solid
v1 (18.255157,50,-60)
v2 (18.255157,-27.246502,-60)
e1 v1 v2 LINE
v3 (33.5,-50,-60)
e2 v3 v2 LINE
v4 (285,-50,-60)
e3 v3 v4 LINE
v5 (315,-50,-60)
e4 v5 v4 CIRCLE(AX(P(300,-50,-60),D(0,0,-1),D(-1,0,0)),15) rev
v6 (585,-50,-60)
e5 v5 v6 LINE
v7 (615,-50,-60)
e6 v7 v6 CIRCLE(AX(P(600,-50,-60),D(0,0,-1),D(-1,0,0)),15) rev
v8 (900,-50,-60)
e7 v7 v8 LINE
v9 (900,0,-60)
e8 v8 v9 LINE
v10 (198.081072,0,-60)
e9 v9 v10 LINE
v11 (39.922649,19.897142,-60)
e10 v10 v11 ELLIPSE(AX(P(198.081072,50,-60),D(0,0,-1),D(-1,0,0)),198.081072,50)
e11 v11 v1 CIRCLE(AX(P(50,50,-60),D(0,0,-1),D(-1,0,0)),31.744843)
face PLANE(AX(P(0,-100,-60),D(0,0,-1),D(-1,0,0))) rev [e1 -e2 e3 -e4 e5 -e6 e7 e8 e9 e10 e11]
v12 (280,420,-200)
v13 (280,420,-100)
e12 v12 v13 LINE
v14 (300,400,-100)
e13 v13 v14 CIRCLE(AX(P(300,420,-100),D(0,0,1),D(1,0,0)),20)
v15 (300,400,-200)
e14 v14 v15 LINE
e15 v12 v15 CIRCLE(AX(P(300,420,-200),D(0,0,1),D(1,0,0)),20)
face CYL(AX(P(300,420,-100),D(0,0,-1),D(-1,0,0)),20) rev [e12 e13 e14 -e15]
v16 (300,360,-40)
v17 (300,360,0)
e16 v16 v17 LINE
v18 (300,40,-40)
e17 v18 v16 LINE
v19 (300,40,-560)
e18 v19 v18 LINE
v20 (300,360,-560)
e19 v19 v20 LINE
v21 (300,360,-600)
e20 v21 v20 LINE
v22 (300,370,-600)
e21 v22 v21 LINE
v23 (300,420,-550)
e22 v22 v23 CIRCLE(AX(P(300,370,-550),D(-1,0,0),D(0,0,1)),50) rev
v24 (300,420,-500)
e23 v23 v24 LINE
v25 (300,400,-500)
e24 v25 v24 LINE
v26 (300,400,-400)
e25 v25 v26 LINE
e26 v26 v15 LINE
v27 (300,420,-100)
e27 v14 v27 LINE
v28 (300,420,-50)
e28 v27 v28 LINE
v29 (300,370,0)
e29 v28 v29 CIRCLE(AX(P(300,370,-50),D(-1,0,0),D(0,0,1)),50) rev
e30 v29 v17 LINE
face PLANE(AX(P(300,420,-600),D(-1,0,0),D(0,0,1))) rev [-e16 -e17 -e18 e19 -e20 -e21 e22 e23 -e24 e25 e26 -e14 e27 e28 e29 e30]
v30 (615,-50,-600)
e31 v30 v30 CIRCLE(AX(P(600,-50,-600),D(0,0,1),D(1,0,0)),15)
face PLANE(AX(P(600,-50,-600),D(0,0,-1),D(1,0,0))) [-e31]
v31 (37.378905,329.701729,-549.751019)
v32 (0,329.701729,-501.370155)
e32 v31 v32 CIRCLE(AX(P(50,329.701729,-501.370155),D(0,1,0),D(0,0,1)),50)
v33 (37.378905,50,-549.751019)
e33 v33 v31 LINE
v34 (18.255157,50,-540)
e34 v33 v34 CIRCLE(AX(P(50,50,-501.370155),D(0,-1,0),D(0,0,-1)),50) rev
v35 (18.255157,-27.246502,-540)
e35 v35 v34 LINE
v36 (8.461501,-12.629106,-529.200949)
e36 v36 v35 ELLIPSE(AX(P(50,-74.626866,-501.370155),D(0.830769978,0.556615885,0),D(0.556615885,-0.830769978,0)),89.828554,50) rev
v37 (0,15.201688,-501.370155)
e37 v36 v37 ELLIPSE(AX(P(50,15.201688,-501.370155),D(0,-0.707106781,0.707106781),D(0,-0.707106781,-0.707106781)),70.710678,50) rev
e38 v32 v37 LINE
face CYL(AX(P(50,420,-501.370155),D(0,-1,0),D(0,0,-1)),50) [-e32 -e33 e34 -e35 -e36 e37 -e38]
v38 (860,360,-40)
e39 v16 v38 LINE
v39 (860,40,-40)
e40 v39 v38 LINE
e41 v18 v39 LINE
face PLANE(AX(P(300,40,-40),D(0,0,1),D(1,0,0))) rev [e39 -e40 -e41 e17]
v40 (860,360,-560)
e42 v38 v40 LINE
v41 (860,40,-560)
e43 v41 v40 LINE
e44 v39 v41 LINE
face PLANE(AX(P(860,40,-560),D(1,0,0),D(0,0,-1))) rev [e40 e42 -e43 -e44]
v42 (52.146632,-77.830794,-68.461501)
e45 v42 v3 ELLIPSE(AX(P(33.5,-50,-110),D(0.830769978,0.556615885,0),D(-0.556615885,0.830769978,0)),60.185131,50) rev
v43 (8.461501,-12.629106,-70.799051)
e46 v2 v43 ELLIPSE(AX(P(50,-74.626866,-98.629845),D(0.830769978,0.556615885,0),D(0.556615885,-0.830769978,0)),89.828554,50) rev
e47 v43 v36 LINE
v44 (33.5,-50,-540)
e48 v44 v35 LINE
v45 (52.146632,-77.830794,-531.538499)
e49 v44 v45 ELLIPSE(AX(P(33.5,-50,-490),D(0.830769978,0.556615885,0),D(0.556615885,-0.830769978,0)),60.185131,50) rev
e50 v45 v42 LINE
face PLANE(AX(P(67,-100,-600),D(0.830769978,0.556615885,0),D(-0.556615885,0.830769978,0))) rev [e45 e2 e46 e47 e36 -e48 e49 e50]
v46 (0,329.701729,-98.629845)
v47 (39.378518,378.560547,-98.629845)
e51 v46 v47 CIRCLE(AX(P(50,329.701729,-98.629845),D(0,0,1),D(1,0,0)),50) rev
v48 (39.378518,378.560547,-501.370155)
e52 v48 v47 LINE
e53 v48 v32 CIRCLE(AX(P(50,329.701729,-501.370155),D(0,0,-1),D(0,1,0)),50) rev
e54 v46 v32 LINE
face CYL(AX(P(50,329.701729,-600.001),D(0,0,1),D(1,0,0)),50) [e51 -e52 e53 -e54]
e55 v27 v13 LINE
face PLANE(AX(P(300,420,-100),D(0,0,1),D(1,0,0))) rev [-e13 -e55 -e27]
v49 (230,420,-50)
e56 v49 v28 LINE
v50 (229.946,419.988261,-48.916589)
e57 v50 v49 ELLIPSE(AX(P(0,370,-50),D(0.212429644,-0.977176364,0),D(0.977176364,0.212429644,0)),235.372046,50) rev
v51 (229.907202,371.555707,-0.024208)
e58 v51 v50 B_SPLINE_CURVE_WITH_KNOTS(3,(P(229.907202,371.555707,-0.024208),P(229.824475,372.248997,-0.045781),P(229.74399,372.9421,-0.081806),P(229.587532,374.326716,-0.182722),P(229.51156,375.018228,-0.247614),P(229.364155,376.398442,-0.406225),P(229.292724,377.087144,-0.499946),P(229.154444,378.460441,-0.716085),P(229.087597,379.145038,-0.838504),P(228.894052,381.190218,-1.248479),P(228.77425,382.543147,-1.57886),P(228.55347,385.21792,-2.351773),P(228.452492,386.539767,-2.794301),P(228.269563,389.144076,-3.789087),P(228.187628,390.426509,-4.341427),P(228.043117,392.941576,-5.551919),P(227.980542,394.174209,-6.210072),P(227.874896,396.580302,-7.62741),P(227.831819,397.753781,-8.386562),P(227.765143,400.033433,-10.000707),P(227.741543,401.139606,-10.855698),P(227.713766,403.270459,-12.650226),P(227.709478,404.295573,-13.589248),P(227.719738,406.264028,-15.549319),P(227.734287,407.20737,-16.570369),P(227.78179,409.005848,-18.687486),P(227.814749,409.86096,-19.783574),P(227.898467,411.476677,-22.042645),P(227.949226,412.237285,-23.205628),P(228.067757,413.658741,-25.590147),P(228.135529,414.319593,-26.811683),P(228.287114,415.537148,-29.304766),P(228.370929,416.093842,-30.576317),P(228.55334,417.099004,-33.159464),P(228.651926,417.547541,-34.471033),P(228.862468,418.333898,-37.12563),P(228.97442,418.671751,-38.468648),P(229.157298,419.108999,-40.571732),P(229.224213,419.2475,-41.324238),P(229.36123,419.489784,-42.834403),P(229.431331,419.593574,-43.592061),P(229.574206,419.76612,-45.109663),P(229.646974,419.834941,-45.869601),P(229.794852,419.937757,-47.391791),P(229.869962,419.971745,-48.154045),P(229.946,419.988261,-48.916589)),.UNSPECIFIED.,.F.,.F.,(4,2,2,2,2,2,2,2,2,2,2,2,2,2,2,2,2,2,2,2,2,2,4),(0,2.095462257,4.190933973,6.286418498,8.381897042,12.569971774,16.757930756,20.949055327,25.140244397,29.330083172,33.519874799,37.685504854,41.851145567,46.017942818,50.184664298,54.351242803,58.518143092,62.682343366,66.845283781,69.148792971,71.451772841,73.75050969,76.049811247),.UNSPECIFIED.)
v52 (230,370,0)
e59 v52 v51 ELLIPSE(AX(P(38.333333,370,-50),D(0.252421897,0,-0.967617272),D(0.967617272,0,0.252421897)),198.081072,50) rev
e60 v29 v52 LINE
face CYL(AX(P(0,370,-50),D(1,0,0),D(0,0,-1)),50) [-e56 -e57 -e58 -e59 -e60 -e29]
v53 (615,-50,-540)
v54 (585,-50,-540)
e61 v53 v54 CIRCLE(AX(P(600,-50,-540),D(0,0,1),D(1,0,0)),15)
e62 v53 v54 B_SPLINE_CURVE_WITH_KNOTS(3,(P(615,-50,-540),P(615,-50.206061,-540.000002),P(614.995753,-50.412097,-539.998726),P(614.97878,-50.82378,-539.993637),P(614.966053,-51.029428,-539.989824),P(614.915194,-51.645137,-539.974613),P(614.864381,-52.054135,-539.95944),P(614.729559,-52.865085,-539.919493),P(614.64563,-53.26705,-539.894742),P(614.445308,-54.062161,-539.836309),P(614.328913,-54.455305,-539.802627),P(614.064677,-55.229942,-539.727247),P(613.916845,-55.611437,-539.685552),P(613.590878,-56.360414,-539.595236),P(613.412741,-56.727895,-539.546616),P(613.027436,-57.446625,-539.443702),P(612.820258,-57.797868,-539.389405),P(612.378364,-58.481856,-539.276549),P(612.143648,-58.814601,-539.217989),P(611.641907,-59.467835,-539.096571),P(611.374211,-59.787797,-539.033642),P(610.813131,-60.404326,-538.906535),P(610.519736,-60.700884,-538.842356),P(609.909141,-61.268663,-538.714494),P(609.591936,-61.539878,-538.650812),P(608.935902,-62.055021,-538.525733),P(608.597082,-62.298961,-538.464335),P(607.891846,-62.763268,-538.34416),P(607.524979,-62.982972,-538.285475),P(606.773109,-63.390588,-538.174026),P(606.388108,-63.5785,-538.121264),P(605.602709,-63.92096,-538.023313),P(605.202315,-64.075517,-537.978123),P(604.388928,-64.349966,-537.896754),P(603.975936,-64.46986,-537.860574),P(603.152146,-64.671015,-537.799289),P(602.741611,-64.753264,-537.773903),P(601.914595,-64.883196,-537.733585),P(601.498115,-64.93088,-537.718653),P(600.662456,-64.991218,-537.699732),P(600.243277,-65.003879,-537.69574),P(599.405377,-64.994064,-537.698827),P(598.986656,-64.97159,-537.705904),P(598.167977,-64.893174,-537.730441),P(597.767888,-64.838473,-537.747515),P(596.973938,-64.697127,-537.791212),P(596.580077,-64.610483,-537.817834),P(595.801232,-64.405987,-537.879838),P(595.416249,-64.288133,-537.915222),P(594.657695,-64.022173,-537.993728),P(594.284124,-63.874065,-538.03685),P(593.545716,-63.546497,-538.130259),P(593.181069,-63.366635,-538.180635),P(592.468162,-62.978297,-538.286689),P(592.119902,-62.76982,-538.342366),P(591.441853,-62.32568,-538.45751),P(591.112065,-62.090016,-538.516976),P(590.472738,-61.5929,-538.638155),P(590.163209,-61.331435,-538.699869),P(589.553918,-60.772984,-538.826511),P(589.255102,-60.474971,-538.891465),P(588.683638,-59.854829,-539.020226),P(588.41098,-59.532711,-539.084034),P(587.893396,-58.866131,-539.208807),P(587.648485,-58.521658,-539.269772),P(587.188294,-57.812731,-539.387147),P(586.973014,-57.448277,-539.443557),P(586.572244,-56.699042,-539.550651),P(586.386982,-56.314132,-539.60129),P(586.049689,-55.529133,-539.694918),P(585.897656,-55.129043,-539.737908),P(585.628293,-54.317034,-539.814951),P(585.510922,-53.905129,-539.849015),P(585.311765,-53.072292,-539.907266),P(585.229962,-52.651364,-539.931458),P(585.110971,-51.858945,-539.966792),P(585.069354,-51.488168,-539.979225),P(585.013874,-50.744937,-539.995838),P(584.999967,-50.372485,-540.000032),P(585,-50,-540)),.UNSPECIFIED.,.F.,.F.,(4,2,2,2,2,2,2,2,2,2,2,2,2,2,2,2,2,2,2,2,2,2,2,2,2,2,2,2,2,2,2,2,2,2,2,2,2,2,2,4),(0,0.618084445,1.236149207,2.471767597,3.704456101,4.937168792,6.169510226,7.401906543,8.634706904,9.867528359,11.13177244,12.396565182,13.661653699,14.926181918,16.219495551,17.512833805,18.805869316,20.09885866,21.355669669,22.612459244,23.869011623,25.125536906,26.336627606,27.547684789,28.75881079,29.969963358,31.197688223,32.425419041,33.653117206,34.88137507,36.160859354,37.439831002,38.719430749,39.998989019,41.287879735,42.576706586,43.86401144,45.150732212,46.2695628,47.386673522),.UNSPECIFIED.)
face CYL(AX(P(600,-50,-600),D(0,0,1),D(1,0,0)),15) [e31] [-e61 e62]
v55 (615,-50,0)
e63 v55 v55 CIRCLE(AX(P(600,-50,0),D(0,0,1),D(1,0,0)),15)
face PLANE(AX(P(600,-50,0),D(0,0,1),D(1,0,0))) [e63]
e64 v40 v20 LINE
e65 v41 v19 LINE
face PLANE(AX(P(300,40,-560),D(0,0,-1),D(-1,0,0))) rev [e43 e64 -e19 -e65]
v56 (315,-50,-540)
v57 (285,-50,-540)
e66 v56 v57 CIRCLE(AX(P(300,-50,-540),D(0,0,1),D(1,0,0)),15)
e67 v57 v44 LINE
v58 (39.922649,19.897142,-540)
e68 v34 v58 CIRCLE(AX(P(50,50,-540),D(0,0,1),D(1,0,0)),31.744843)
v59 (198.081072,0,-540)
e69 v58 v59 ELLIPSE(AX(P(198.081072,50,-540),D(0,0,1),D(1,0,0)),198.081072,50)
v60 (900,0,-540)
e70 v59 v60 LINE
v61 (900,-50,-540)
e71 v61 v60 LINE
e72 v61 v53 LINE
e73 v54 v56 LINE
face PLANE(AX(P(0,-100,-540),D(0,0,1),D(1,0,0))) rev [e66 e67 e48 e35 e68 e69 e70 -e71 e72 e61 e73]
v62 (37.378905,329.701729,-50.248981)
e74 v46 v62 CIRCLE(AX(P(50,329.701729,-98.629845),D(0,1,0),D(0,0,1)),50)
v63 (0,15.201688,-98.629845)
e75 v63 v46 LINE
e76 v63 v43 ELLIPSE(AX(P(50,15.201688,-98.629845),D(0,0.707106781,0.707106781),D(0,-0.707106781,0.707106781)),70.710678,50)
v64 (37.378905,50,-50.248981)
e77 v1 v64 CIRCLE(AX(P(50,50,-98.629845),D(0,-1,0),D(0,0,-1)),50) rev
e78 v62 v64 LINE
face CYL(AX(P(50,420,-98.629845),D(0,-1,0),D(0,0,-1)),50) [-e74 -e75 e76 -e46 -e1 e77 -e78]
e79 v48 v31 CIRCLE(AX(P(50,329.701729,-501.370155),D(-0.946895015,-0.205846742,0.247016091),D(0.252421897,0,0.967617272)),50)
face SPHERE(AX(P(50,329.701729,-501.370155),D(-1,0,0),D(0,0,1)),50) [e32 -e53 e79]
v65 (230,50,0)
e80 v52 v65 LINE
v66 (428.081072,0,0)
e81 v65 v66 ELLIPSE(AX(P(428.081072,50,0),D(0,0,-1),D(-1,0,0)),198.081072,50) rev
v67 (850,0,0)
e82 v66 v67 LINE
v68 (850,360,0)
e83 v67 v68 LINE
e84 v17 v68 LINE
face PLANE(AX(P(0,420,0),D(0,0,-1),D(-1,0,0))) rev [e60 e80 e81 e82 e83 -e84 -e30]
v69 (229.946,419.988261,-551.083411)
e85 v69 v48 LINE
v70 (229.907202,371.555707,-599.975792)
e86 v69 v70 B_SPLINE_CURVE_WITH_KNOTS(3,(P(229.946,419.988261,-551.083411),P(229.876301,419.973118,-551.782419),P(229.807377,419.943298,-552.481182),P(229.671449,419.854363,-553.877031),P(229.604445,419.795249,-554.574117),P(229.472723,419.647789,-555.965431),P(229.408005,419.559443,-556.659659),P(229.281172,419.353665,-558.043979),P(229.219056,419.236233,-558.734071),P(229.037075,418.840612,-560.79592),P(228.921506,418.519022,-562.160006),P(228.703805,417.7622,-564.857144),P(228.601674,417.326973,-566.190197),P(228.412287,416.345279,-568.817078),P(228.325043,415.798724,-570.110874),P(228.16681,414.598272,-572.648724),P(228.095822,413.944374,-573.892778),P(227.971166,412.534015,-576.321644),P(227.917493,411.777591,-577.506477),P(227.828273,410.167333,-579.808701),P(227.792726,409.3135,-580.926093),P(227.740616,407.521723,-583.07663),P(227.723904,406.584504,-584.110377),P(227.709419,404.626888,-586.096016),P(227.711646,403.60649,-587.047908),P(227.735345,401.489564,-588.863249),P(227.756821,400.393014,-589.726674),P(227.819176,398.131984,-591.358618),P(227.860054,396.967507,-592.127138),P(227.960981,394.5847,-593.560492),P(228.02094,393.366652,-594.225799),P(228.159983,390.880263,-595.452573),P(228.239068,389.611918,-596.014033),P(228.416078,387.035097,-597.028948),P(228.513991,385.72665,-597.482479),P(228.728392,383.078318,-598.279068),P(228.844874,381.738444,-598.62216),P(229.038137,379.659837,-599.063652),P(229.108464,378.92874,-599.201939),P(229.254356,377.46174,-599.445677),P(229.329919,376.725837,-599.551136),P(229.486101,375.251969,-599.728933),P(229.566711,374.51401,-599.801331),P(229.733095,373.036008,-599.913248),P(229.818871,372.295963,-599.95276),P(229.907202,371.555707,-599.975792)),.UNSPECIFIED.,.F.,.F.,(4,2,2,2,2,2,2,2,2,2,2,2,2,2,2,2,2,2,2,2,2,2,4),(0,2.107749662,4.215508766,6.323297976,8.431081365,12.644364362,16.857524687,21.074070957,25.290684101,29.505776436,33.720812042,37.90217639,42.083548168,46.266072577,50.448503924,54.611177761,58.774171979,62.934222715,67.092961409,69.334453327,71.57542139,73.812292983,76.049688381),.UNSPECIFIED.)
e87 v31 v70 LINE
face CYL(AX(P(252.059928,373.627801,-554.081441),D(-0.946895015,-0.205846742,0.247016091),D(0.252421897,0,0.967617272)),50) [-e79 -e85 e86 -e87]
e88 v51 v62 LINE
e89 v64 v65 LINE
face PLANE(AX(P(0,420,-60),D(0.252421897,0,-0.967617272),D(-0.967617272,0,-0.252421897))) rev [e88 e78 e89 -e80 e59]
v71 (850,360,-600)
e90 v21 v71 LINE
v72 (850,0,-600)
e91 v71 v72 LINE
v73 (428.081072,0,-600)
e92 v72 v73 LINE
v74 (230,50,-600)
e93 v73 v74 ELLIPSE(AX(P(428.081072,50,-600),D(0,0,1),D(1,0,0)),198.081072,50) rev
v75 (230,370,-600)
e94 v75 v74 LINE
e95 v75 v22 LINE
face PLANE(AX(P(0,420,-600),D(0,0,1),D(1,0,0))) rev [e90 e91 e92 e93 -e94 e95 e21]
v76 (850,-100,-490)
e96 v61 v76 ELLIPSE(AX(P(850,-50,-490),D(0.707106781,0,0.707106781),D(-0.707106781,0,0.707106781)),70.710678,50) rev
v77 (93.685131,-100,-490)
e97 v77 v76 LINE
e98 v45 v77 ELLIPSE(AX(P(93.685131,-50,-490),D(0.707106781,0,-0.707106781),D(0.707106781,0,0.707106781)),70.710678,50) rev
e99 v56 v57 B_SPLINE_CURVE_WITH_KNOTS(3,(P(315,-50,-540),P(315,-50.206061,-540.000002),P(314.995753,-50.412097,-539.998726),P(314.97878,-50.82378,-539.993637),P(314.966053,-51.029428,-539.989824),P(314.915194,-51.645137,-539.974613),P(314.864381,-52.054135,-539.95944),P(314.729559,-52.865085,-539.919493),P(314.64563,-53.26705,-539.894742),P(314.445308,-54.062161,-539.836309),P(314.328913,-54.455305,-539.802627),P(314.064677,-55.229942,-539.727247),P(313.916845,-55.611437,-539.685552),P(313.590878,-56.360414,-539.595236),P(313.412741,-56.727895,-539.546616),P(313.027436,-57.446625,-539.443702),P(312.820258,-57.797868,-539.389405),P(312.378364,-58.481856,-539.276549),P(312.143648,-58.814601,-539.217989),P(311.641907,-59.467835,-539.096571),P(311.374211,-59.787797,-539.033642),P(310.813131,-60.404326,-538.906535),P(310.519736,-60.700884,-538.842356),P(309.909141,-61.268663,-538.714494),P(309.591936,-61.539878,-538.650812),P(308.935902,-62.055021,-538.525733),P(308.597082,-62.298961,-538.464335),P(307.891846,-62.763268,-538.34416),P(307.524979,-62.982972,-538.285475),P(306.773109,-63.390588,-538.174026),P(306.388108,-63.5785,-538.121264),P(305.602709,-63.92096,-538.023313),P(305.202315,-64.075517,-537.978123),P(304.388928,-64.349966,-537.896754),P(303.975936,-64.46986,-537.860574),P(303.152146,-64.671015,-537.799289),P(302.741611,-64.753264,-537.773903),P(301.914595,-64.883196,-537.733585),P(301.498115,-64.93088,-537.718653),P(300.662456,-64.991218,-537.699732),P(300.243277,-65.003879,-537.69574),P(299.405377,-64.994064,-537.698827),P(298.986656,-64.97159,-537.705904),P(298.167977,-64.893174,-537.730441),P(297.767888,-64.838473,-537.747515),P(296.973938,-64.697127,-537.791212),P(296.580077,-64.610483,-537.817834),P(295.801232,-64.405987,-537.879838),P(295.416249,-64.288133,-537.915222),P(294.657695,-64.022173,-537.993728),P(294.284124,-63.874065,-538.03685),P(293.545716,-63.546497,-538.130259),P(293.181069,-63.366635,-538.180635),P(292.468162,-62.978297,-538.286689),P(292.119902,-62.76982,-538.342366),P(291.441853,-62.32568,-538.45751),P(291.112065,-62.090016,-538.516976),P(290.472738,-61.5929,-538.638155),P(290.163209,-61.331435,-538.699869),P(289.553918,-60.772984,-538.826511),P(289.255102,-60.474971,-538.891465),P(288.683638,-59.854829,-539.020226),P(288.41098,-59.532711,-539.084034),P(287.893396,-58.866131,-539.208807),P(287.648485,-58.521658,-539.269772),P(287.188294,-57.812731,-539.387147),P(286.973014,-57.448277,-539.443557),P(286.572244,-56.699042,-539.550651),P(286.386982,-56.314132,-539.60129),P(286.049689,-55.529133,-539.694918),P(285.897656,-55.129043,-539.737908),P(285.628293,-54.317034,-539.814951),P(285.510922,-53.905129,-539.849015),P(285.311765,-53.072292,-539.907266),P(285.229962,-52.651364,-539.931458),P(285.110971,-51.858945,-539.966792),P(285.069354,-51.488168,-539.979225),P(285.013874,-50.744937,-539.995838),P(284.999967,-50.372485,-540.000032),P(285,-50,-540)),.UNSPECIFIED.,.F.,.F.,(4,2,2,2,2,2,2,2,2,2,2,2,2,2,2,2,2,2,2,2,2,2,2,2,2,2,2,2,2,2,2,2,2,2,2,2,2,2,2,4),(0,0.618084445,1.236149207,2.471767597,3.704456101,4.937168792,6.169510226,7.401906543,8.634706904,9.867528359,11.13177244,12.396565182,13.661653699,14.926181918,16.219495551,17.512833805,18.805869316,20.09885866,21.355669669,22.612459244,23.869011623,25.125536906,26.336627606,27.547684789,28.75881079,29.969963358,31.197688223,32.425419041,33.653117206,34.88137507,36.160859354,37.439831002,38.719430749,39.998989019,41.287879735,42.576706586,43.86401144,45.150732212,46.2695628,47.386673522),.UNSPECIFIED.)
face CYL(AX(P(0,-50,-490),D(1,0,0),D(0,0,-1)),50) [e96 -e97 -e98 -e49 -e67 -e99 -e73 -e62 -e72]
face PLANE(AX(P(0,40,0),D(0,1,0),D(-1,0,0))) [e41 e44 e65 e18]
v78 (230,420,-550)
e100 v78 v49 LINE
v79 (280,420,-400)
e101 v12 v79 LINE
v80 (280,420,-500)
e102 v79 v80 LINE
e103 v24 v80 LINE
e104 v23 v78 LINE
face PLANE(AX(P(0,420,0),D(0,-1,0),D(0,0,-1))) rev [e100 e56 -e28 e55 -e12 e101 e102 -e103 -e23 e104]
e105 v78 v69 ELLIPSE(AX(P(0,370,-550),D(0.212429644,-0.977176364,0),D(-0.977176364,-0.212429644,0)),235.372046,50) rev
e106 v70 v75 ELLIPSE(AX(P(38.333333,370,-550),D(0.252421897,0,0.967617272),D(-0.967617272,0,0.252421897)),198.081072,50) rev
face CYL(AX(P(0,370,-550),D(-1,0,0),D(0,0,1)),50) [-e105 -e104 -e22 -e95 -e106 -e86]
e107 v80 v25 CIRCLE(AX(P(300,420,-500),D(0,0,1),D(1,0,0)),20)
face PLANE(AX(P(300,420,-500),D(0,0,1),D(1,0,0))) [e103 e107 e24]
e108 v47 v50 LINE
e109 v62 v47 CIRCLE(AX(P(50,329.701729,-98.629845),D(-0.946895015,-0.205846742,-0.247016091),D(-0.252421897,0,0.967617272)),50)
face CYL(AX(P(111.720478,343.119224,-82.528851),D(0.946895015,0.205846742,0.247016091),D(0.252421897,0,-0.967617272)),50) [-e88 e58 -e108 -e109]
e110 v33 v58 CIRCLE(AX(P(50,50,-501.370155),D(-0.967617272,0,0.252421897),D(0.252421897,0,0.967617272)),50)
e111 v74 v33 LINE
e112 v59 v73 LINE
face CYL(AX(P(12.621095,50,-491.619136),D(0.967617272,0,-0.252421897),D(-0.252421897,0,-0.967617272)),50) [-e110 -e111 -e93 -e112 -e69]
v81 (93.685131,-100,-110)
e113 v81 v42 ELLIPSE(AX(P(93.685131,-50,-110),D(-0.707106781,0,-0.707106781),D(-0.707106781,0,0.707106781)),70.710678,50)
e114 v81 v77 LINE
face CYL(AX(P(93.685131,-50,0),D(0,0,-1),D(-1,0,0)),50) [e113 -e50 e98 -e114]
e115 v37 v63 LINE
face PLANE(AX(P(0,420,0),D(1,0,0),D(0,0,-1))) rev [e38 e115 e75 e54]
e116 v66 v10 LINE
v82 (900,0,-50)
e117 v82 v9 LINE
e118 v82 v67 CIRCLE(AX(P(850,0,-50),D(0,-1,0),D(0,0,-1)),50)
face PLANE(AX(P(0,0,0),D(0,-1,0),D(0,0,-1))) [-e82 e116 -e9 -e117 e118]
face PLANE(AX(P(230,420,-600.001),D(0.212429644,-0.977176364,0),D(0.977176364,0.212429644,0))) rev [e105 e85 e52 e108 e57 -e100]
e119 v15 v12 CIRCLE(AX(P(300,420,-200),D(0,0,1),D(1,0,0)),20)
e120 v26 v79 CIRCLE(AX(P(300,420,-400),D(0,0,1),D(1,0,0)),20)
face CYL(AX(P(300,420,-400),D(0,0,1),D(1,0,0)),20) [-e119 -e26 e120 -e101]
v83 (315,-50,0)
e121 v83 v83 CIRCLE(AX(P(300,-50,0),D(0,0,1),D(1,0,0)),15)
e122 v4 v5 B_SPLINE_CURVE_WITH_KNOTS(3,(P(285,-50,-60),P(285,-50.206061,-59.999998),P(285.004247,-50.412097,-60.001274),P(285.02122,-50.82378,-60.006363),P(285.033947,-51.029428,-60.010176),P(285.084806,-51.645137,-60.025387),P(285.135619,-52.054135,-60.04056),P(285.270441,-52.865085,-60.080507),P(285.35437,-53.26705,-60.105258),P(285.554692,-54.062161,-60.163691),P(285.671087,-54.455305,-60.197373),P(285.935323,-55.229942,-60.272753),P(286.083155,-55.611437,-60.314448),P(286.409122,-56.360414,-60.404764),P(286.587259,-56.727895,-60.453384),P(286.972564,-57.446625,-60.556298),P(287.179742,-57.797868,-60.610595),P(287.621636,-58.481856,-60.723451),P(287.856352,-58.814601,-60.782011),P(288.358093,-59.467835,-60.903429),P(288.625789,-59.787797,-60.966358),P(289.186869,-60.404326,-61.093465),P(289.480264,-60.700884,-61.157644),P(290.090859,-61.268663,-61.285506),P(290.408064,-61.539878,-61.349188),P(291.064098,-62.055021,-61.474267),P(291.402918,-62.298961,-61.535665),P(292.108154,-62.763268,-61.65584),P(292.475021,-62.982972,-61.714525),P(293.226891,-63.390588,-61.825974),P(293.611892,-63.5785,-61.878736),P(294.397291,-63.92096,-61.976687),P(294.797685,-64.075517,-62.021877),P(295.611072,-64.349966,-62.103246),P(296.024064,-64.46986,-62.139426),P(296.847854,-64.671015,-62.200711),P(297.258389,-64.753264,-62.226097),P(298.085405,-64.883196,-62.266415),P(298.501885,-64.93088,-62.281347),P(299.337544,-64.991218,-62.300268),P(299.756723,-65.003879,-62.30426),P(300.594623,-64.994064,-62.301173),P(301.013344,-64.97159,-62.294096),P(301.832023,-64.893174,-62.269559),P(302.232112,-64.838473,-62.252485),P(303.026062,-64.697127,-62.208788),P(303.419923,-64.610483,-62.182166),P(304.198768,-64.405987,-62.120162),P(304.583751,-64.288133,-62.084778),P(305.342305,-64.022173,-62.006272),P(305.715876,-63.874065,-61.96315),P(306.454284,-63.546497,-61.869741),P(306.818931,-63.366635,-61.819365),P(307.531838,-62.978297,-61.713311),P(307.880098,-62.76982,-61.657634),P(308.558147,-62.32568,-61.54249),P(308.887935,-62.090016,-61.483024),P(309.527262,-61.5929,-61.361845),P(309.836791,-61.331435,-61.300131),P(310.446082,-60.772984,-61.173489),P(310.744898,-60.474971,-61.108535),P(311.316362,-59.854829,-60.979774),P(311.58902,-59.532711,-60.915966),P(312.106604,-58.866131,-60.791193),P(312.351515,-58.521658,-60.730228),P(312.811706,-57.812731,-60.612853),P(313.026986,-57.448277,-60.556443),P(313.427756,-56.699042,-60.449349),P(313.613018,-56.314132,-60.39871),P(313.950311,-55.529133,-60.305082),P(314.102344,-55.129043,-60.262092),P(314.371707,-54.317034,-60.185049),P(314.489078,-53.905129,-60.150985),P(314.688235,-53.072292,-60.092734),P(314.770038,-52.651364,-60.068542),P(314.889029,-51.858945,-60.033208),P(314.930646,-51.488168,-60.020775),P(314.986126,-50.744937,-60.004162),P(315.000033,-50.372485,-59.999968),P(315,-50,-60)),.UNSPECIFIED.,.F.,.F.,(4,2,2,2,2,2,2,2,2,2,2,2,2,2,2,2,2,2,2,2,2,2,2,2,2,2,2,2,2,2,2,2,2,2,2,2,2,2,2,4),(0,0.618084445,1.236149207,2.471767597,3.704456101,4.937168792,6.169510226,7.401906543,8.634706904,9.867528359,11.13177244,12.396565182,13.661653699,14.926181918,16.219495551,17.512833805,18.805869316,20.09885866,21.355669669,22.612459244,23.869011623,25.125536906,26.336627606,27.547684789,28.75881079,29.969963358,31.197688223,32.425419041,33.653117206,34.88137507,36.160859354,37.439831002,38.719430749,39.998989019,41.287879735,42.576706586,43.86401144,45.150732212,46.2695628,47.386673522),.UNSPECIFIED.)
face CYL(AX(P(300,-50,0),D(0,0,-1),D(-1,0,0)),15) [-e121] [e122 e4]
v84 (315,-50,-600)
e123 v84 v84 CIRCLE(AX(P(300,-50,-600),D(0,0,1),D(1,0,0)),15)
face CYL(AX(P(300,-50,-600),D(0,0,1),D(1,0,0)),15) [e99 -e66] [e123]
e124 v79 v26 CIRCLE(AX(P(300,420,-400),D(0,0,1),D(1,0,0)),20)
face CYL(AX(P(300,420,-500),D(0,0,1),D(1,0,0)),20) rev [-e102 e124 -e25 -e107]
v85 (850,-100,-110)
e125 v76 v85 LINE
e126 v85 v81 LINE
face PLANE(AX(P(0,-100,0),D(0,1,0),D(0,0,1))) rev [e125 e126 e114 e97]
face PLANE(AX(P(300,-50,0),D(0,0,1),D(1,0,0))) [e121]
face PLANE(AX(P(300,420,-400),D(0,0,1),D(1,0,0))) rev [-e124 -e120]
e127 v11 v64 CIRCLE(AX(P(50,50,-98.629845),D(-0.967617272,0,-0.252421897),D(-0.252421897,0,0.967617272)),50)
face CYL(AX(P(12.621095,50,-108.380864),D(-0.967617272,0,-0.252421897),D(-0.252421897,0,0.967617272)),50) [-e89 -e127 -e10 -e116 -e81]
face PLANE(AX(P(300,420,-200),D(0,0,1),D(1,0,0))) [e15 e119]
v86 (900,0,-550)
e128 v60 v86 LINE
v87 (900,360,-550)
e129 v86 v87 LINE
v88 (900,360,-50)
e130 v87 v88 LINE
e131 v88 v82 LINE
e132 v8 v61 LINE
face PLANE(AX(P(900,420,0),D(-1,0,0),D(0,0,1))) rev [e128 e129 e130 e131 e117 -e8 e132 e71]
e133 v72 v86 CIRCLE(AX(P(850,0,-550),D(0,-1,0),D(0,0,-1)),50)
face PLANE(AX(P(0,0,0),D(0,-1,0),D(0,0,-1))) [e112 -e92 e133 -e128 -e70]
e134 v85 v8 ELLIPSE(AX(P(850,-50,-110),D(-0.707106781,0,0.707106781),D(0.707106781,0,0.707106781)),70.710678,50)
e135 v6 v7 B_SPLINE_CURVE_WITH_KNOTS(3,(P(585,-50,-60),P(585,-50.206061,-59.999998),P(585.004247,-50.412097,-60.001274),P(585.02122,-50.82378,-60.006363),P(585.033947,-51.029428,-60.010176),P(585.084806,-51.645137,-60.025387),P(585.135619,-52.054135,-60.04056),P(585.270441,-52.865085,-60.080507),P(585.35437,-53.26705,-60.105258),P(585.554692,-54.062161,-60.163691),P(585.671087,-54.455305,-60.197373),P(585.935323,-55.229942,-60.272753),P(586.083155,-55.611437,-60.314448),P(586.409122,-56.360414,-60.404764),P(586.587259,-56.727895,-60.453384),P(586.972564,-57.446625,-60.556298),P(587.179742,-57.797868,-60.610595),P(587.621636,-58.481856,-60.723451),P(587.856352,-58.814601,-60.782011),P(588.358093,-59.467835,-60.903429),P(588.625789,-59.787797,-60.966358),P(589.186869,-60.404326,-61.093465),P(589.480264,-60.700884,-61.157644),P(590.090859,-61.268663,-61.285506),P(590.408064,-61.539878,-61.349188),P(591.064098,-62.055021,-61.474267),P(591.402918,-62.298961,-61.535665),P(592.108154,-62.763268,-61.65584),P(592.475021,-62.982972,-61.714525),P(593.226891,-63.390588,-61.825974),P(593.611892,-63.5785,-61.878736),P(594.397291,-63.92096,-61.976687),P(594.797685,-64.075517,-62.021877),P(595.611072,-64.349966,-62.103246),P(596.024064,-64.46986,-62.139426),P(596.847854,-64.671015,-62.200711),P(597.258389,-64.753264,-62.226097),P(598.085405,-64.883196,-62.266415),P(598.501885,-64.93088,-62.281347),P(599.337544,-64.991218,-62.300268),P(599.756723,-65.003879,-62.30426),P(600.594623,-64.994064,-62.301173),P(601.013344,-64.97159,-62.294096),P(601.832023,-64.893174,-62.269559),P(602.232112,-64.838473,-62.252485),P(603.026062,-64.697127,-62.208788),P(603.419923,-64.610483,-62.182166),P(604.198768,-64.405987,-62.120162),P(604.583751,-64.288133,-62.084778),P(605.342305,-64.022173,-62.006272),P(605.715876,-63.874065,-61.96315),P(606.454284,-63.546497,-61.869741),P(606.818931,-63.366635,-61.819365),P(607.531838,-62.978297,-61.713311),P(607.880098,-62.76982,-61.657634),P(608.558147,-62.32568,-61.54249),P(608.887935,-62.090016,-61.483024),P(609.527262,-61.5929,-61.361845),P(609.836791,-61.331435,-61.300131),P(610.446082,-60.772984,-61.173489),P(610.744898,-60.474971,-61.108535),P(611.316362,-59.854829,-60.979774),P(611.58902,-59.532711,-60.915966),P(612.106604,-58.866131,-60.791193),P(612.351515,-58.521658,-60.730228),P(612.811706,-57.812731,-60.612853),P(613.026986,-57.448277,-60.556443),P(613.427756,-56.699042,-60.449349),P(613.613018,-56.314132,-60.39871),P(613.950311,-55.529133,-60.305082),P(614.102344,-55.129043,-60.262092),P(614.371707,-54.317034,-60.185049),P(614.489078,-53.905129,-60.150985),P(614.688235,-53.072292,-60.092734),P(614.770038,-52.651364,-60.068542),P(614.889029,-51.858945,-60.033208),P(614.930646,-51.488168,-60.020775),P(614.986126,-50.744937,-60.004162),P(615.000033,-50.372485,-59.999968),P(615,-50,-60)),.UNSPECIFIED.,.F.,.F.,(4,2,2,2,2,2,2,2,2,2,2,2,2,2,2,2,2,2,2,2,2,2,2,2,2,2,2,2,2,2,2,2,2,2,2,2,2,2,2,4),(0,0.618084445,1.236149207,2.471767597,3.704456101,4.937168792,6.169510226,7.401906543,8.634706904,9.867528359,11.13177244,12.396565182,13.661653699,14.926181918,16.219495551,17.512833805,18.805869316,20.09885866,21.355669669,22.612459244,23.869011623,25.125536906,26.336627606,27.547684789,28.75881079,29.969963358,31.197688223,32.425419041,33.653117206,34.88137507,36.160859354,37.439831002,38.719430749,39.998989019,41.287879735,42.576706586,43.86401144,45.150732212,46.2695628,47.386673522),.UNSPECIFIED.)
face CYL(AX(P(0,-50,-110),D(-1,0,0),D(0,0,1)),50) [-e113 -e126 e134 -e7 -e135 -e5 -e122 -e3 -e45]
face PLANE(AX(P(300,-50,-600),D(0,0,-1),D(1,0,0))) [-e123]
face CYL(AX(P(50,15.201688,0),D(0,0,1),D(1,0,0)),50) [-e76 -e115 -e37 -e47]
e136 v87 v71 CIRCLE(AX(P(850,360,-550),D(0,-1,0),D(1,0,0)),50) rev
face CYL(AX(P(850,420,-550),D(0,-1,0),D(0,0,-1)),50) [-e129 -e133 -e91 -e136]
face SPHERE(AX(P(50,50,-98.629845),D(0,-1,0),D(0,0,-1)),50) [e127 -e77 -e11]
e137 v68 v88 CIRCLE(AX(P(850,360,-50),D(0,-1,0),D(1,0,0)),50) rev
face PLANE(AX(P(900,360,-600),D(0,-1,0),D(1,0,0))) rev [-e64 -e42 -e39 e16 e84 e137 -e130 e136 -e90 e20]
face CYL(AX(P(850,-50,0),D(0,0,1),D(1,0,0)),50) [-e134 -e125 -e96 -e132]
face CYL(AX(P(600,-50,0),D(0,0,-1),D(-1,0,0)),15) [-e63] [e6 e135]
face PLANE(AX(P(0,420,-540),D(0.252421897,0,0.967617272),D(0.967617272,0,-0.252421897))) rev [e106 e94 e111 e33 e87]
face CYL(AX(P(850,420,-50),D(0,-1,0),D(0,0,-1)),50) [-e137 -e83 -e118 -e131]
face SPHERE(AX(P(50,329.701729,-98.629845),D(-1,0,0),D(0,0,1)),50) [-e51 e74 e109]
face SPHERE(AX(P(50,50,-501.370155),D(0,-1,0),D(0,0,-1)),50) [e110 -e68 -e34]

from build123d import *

# Parameters (mm, degrees)
SKETCH1_W                = 900
SKETCH1_H                = 600
BOSS_EXTRUDE1_DEPTH      = 420
SKETCH2_W                = 900
SKETCH2_H                = 480
BOSS_EXTRUDE2_DEPTH      = 100
SKETCH3_W                = 600
SKETCH3_H                = 60
CUT_EXTRUDE1_DEPTH       = 1161.344776349
SKETCH4_W                = 560
SKETCH4_H                = 520
CUT_EXTRUDE2_DEPTH       = 320
CUT_EXTRUDE3_REACH       = 1162.345
CUT_EXTRUDE4_DEPTH       = 1161.344776349
CUT_EXTRUDE6_DEPTH       = 1131.486620885
SKETCH9_R                = 15
BOSS_EXTRUDE3_DEPTH      = 60
BOSS_EXTRUDE4_DEPTH      = 100
BOSS_EXTRUDE4_DEPTH_BACK = 100
SKETCH10_R               = 20
CUT_EXTRUDE7_START       = -100
SKETCH10_2_R             = 20
CUT_EXTRUDE7_DEPTH       = 100
CUT_EXTRUDE8_START       = 200
SKETCH10_3_R             = 20
CUT_EXTRUDE8_DEPTH       = 100
FILLET1_R                = 50
FILLET2_R                = 50
FILLET3_R                = 50


with BuildPart() as part:
    # Sketch1 → Boss-Extrude1 (new body)
    with BuildSketch(Plane(origin=(0, 0, 0), x_dir=(1, 0, 0), z_dir=(0, 1, 0))):
        with Locations((450, 300)):
            Rectangle(SKETCH1_W, SKETCH1_H)
    extrude(amount=BOSS_EXTRUDE1_DEPTH)

    # Sketch2 → Boss-Extrude2 (add)
    with BuildSketch(Plane.XZ):
        with Locations((450, -300)):
            Rectangle(SKETCH2_W, SKETCH2_H)
    extrude(amount=BOSS_EXTRUDE2_DEPTH)

    # Sketch3 → Cut-Extrude1 (cut, through all)
    with BuildSketch(Plane.XY):
        with Locations((600, 390)):
            Rectangle(SKETCH3_W, SKETCH3_H)
    extrude(amount=-CUT_EXTRUDE1_DEPTH, mode=Mode.SUBTRACT)

    # Sketch4 → Cut-Extrude2 (cut)
    with BuildSketch(Plane(origin=(0, 360, 0), x_dir=(1, 0, 0), z_dir=(0, 1, 0))):
        with Locations((580, 300)):
            Rectangle(SKETCH4_W, SKETCH4_H)
    extrude(amount=-CUT_EXTRUDE2_DEPTH, mode=Mode.SUBTRACT)

    # Sketch5 → Cut-Extrude3 (cut, up to next)
    with BuildSketch(Plane.XY, mode=Mode.PRIVATE) as cut_extrude3_sk1:
        Polygon((230, 420), (0, 370), (0, 420), align=None)
    cut_extrude3_tool1 = extrude(cut_extrude3_sk1.sketch, amount=-CUT_EXTRUDE3_REACH, mode=Mode.PRIVATE) & part.part
    add(cut_extrude3_tool1.solids().sort_by_distance((76.666667, 403.333333, 0))[0], mode=Mode.SUBTRACT)

    # Sketch6 → Cut-Extrude4 (cut, through all)
    with BuildSketch(Plane.XZ):
        Polygon((0, -60), (230, 0), (0, 0), align=None)
        Polygon((230, -600), (0, -600), (0, -540), align=None)
    extrude(amount=-CUT_EXTRUDE4_DEPTH, mode=Mode.SUBTRACT)

    # Sketch8 → Cut-Extrude6 (cut, through all)
    with BuildSketch(Plane.XY.offset(-60)):
        Polygon((0, 0), (0, -100), (67, -100), align=None)
    extrude(amount=-CUT_EXTRUDE6_DEPTH, mode=Mode.SUBTRACT)

    # Sketch9 → Boss-Extrude3 (add)
    with BuildSketch(Plane.XY.offset(-60)):
        with Locations(Location((300, -50, 0), (0, 0, 180))):
            Circle(SKETCH9_R)
        with Locations(Location((600, -50, 0), (0, 0, 180))):
            Circle(SKETCH9_R)
    boss_extrude3 = extrude(amount=BOSS_EXTRUDE3_DEPTH)

    # Mirror1: Boss-Extrude3 across plane
    add(boss_extrude3.mirror(Plane.XY.offset(-300)))

    # Sketch10 → Boss-Extrude4 (add, two sides: drawn at the far end of the back side and taken through both)
    with BuildSketch(Plane.XY.offset(-300).offset(-BOSS_EXTRUDE4_DEPTH_BACK)):
        with Locations((300, 420)):
            Circle(SKETCH10_R)
    extrude(amount=BOSS_EXTRUDE4_DEPTH + BOSS_EXTRUDE4_DEPTH_BACK)

    # Sketch10<2> → Cut-Extrude7 (cut)
    with BuildSketch(Plane.XY.offset(-300).offset(CUT_EXTRUDE7_START)):
        with Locations((300, 420)):
            Circle(SKETCH10_2_R)
    extrude(amount=-CUT_EXTRUDE7_DEPTH, mode=Mode.SUBTRACT)

    # Sketch10<3> → Cut-Extrude8 (cut)
    with BuildSketch(Plane.XY.offset(-300).offset(CUT_EXTRUDE8_START)):
        with Locations((300, 420)):
            Circle(SKETCH10_3_R)
    extrude(amount=-CUT_EXTRUDE8_DEPTH, mode=Mode.SUBTRACT)

    # Fillet1
    # the kernel refuses this fillet: 50 mm, written as the material it takes off along each edge
    with BuildSketch(Plane(origin=(50, 329.701729148, -98.629844887), x_dir=(0.6192801017568266, 0.7683705636310696, 0.1615513308930852), z_dir=(-0.7290664199156293, 0.48634721888098287, 0.4815895950268663))) as fillet1_piece_1_section:
        Polygon((-89.929696939, -89.929696939), (89.929696939, -89.929696939), (89.929696939, 89.929696939), (-89.929696939, 89.929696939), align=None)
    fillet1_piece_1 = extrude(amount=89.929696939, mode=Mode.PRIVATE)
    fillet1_piece_1 = split(fillet1_piece_1, bisect_by=Plane(origin=(50, 329.701729148, -98.629844887), z_dir=(0, 1, 0)), keep=Keep.TOP, mode=Mode.PRIVATE)
    fillet1_piece_1 = split(fillet1_piece_1, bisect_by=Plane(origin=(50, 329.701729148, -98.629844887), z_dir=(0, 0, 1)), keep=Keep.TOP, mode=Mode.PRIVATE)
    fillet1_piece_1 = split(fillet1_piece_1, bisect_by=Plane(origin=(50, 329.701729148, -98.629844887), z_dir=(-0.9468950150315111, -0.20584674239815454, -0.24701609087778548)), keep=Keep.TOP, mode=Mode.PRIVATE)
    fillet1_piece_1 = split(fillet1_piece_1, bisect_by=Plane(origin=(37.378905143, 329.701729148, -50.248981267), z_dir=(0.25242189714700275, 0, -0.9676172723968439)), keep=Keep.TOP, mode=Mode.PRIVATE)
    fillet1_piece_1 = split(fillet1_piece_1, bisect_by=Plane(origin=(0, 329.701729148, -98.629844887), z_dir=(1, 0, 0)), keep=Keep.TOP, mode=Mode.PRIVATE)
    fillet1_piece_1 = split(fillet1_piece_1, bisect_by=Plane(origin=(39.378517783, 378.560547344, -98.629844887), z_dir=(0.21242964433104364, -0.9771763639228009, 0)), keep=Keep.TOP, mode=Mode.PRIVATE)
    fillet1_piece_1 = fillet1_piece_1 - Plane(origin=(50, 329.701729148, -98.629844887), x_dir=(0.7290664199156293, -0.48634721888098287, -0.4815895950268663), z_dir=(0.6192801017568266, 0.7683705636310696, 0.1615513308930852)) * Sphere(FILLET1_R, mode=Mode.PRIVATE)
    add(fillet1_piece_1, mode=Mode.SUBTRACT)
    with BuildSketch(Plane(origin=(50, 329.701729148, -501.370155113), x_dir=(-0.6192801017568265, -0.7683705636310695, 0.16155133089308576), z_dir=(-0.7290664199156294, 0.48634721888098265, -0.481589595026866))) as fillet1_piece_2_section:
        Polygon((-89.929696939, -89.929696939), (89.929696939, -89.929696939), (89.929696939, 89.929696939), (-89.929696939, 89.929696939), align=None)
    fillet1_piece_2 = extrude(amount=89.929696939, mode=Mode.PRIVATE)
    fillet1_piece_2 = split(fillet1_piece_2, bisect_by=Plane(origin=(50, 329.701729148, -501.370155113), z_dir=(0, 1, 0)), keep=Keep.TOP, mode=Mode.PRIVATE)
    fillet1_piece_2 = split(fillet1_piece_2, bisect_by=Plane(origin=(50, 329.701729148, -501.370155113), z_dir=(0, 0, -1)), keep=Keep.TOP, mode=Mode.PRIVATE)
    fillet1_piece_2 = split(fillet1_piece_2, bisect_by=Plane(origin=(50, 329.701729148, -501.370155113), z_dir=(-0.9468950150315109, -0.20584674239815448, 0.24701609087778634)), keep=Keep.TOP, mode=Mode.PRIVATE)
    fillet1_piece_2 = split(fillet1_piece_2, bisect_by=Plane(origin=(37.378905143, 329.701729148, -549.751018733), z_dir=(0.25242189714700364, 0, 0.9676172723968437)), keep=Keep.TOP, mode=Mode.PRIVATE)
    fillet1_piece_2 = split(fillet1_piece_2, bisect_by=Plane(origin=(0, 329.701729148, -501.370155113), z_dir=(1, 0, 0)), keep=Keep.TOP, mode=Mode.PRIVATE)
    fillet1_piece_2 = split(fillet1_piece_2, bisect_by=Plane(origin=(39.378517783, 378.560547344, -501.370155113), z_dir=(0.21242964433104364, -0.9771763639228009, 0)), keep=Keep.TOP, mode=Mode.PRIVATE)
    fillet1_piece_2 = fillet1_piece_2 - Plane(origin=(50, 329.701729148, -501.370155113), x_dir=(0.7290664199156294, -0.48634721888098265, 0.481589595026866), z_dir=(-0.6192801017568265, -0.7683705636310695, 0.16155133089308576)) * Sphere(FILLET1_R, mode=Mode.PRIVATE)
    add(fillet1_piece_2, mode=Mode.SUBTRACT)
    with BuildSketch(Plane(origin=(0, 0, -21.995779649), x_dir=(0, 1, 0), z_dir=(0, 0, -1))) as fillet1_piece_3:
        with BuildLine():
            CenterArc((FILLET1_R * 0.304033762809, FILLET1_R), FILLET1_R, 236.177914783, 33.822085217)
            Line((-FILLET1_R * 0.252582122431, FILLET1_R * 0.169230022029), (0, 0))
            Line((0, 0), (FILLET1_R * 0.304033762809, 0))
        make_face()
    extrude(amount=556.008440702, mode=Mode.SUBTRACT)
    with BuildSketch(Plane(origin=(900, -100, -665), x_dir=(-1, 0, 0), z_dir=(0, 0, 1))) as fillet1_piece_4:
        with BuildLine():
            CenterArc((FILLET1_R, -FILLET1_R), FILLET1_R, 90, 90)
            Line((0, -FILLET1_R), (0, 0))
            Line((0, 0), (FILLET1_R, 0))
        make_face()
    extrude(amount=730, mode=Mode.SUBTRACT)
    with BuildSketch(Plane(origin=(1025, -100, -60), x_dir=(0, 0, -1), z_dir=(-1, 0, 0))) as fillet1_piece_5_section:
        with BuildLine():
            CenterArc((FILLET1_R, -FILLET1_R), FILLET1_R, 90, 90)
            Line((0, -FILLET1_R), (0, 0))
            Line((0, 0), (FILLET1_R, 0))
        make_face()
    fillet1_piece_5 = extrude(amount=1083, mode=Mode.PRIVATE)
    fillet1_piece_5 = fillet1_piece_5 - Plane(origin=(600, -50, -60), x_dir=(-1, 0, 0), z_dir=(0, 0, -1)) * Cylinder(15, 2366, mode=Mode.PRIVATE)
    fillet1_piece_5 = fillet1_piece_5 - Plane(origin=(300, -50, -60), x_dir=(-1, 0, 0), z_dir=(0, 0, -1)) * Cylinder(15, 2366, mode=Mode.PRIVATE)
    add(fillet1_piece_5, mode=Mode.SUBTRACT)
    with BuildSketch(Plane(origin=(900, -125, -600), x_dir=(-1, 0, 0), z_dir=(0, 1, 0))) as fillet1_piece_6:
        with BuildLine():
            CenterArc((FILLET1_R, FILLET1_R), FILLET1_R, 180, 90)
            Line((0, FILLET1_R), (0, 0))
            Line((0, 0), (FILLET1_R, 0))
        make_face()
    extrude(amount=610, mode=Mode.SUBTRACT)
    with BuildSketch(Plane(origin=(900, -125, 0), x_dir=(-1, 0, 0), z_dir=(0, 1, 0))) as fillet1_piece_7:
        with BuildLine():
            CenterArc((FILLET1_R, -FILLET1_R), FILLET1_R, 90, 90)
            Line((0, -FILLET1_R), (0, 0))
            Line((0, 0), (FILLET1_R, 0))
        make_face()
    extrude(amount=610, mode=Mode.SUBTRACT)
    with BuildSketch(Plane(origin=(0, 370, -98.629844887), x_dir=(0, -1, 0), z_dir=(0, 0, -1))) as fillet1_piece_8:
        with BuildLine():
            CenterArc((FILLET1_R * 0.805965417038, -FILLET1_R), FILLET1_R, 90, 77.735226272)
            Line((-FILLET1_R * 0.171210946885, -FILLET1_R * 0.787570355669), (0, 0))
            Line((0, 0), (FILLET1_R * 0.805965417038, 0))
        make_face()
    extrude(amount=402.740310226, mode=Mode.SUBTRACT)
    with BuildSketch(Plane(origin=(566.529427721, 493.158571244, -687.790285493), x_dir=(0.19918086341107819, -0.9785842419761663, -0.05196022523767174), z_dir=(-0.9468950150315109, -0.20584674239815448, 0.24701609087778634))) as fillet1_piece_9:
        with BuildLine():
            CenterArc((FILLET1_R * 0.947741611278, FILLET1_R), FILLET1_R, 183.073782419, 86.926217581)
            Line((-FILLET1_R * 0.0508197000604, FILLET1_R * 0.946378106168), (0, 0))
            Line((0, 0), (FILLET1_R * 0.947741611278, 0))
        make_face()
    extrude(amount=568.794970562, mode=Mode.SUBTRACT)
    with BuildSketch(Plane(origin=(566.529427721, 493.158571244, 87.790285493), x_dir=(0.19918086341107794, -0.9785842419761663, 0.05196022523767291), z_dir=(-0.9468950150315111, -0.20584674239815454, -0.24701609087778548))) as fillet1_piece_10:
        with BuildLine():
            CenterArc((FILLET1_R * 0.947741611278, -FILLET1_R), FILLET1_R, 90, 86.926217581)
            Line((-FILLET1_R * 0.0508197000604, -FILLET1_R * 0.946378106168), (0, 0))
            Line((0, 0), (FILLET1_R * 0.947741611278, 0))
        make_face()
    extrude(amount=568.794970562, mode=Mode.SUBTRACT)
    with BuildSketch(Plane(origin=(0, -96.574612217, -60), x_dir=(0.9676172723968437, 0, 0.25242189714700275), z_dir=(0, 1, 0)), Plane(origin=(0, -96.574612217, -540), x_dir=(0, 0, 1), z_dir=(0, 1, 0))) as fillet1_piece_11:
        with BuildLine():
            CenterArc((FILLET1_R * 0.77259689774, FILLET1_R), FILLET1_R, 194.620873989, 75.379126011)
            Line((-FILLET1_R * 0.195020374657, FILLET1_R * 0.747578102853), (0, 0))
            Line((0, 0), (FILLET1_R * 0.77259689774, 0))
        make_face()
    extrude(amount=426.276341366, mode=Mode.SUBTRACT)
    with BuildSketch(Plane(origin=(-58, -100, -540), x_dir=(0, 1, 0), z_dir=(1, 0, 0))) as fillet1_piece_12_section:
        with BuildLine():
            CenterArc((FILLET1_R, FILLET1_R), FILLET1_R, 180, 90)
            Line((0, FILLET1_R), (0, 0))
            Line((0, 0), (FILLET1_R, 0))
        make_face()
    fillet1_piece_12 = extrude(amount=1083, mode=Mode.PRIVATE)
    fillet1_piece_12 = fillet1_piece_12 - Plane(origin=(300, -50, -540), x_dir=(-1, 0, 0), z_dir=(0, 0, 1)) * Cylinder(15, 2366, mode=Mode.PRIVATE)
    fillet1_piece_12 = fillet1_piece_12 - Plane(origin=(600, -50, -540), x_dir=(-1, 0, 0), z_dir=(0, 0, 1)) * Cylinder(15, 2366, mode=Mode.PRIVATE)
    add(fillet1_piece_12, mode=Mode.SUBTRACT)
    with BuildSketch(Plane(origin=(67, -100, 6.712827635), x_dir=(1, 0, 0), z_dir=(0, 0, -1))) as fillet1_piece_13:
        with BuildLine():
            CenterArc((FILLET1_R * 0.533702621082, -FILLET1_R), FILLET1_R, 90, 56.177914783)
            Line((-FILLET1_R * 0.297067356889, -FILLET1_R * 0.443384114759), (0, 0))
            Line((0, 0), (FILLET1_R * 0.533702621082, 0))
        make_face()
    extrude(amount=613.425655271, mode=Mode.SUBTRACT)

    # Fillet2
    # the kernel refuses this fillet: 50 mm, written as the material it takes off along each edge
    with BuildSketch(Plane(origin=(37.378905143, 0, -50.248981267), x_dir=(0.25242189714700275, 0, -0.9676172723968439), z_dir=(0.9676172723968439, 0, 0.25242189714700275))) as fillet2_piece_1_section:
        with BuildLine():
            CenterArc((FILLET2_R, FILLET2_R), FILLET2_R, 180, 90)
            Line((0, FILLET2_R), (0, 0))
            Line((0, 0), (FILLET2_R, 0))
        make_face()
    fillet2_piece_1 = extrude(amount=411.567441593, mode=Mode.PRIVATE)
    fillet2_piece_1 = split(fillet2_piece_1, bisect_by=Plane(origin=(37.378905143, 0, -60), z_dir=(0, 0, 1)), keep=Keep.TOP, mode=Mode.PRIVATE)
    add(fillet2_piece_1, mode=Mode.SUBTRACT)
    with BuildSketch(Plane(origin=(50, 0, -98.629844887), x_dir=(-0.25242189714696206, 0, 0.9676172723968545), z_dir=(0.9676172723968545, 0, 0.25242189714696206))) as fillet2_piece_2_section:
        with BuildLine():
            CenterArc((50 - FILLET2_R, -FILLET2_R), FILLET2_R, 0, 90)
            Line((50, -FILLET2_R), (50, 0))
            Line((50, 0), (50 - FILLET2_R, 0))
        make_face()
    fillet2_piece_2 = revolve(axis=Axis((50, 0, -98.629844887), (0, -1, 0)), revolution_arc=168.035275563, mode=Mode.PRIVATE)
    fillet2_piece_2 = split(fillet2_piece_2, bisect_by=Plane(origin=(50, 0, -60), z_dir=(0, 0, 1)), keep=Keep.TOP, mode=Mode.PRIVATE)
    add(fillet2_piece_2, mode=Mode.SUBTRACT)
    with BuildSketch(Plane(origin=(50, 0, -501.370155113), x_dir=(0.04634195190400165, 0, 0.998925634616375), z_dir=(0.998925634616375, 0, -0.04634195190400165))) as fillet2_piece_3_section:
        with BuildLine():
            CenterArc((50 - FILLET2_R, -FILLET2_R), FILLET2_R, 0, 90)
            Line((50, -FILLET2_R), (50, 0))
            Line((50, 0), (50 - FILLET2_R, 0))
        make_face()
    fillet2_piece_3 = revolve(axis=Axis((50, 0, -501.370155113), (0, -1, 0)), revolution_arc=168.035275563, mode=Mode.PRIVATE)
    fillet2_piece_3 = split(fillet2_piece_3, bisect_by=Plane(origin=(50, 0, -540), z_dir=(0, 0, -1)), keep=Keep.TOP, mode=Mode.PRIVATE)
    add(fillet2_piece_3, mode=Mode.SUBTRACT)
    with BuildSketch(Plane(origin=(37.378905143, 0, -549.751018733), x_dir=(0.25242189714700364, 0, 0.9676172723968436), z_dir=(0.9676172723968437, 0, -0.25242189714700364))) as fillet2_piece_4_section:
        with BuildLine():
            CenterArc((FILLET2_R, -FILLET2_R), FILLET2_R, 90, 90)
            Line((0, -FILLET2_R), (0, 0))
            Line((0, 0), (FILLET2_R, 0))
        make_face()
    fillet2_piece_4 = extrude(amount=411.567441593, mode=Mode.PRIVATE)
    fillet2_piece_4 = split(fillet2_piece_4, bisect_by=Plane(origin=(37.378905143, 0, -540), z_dir=(0, 0, -1)), keep=Keep.TOP, mode=Mode.PRIVATE)
    add(fillet2_piece_4, mode=Mode.SUBTRACT)

    # Fillet3
    fillet3_edges = [part.edges().sort_by_distance(p)[0] for p in [
        (294.537469961, 420, -600),
        (294.537469961, 420, 0),
    ]]
    fillet(fillet3_edges, radius=FILLET3_R)


solid = part.part
